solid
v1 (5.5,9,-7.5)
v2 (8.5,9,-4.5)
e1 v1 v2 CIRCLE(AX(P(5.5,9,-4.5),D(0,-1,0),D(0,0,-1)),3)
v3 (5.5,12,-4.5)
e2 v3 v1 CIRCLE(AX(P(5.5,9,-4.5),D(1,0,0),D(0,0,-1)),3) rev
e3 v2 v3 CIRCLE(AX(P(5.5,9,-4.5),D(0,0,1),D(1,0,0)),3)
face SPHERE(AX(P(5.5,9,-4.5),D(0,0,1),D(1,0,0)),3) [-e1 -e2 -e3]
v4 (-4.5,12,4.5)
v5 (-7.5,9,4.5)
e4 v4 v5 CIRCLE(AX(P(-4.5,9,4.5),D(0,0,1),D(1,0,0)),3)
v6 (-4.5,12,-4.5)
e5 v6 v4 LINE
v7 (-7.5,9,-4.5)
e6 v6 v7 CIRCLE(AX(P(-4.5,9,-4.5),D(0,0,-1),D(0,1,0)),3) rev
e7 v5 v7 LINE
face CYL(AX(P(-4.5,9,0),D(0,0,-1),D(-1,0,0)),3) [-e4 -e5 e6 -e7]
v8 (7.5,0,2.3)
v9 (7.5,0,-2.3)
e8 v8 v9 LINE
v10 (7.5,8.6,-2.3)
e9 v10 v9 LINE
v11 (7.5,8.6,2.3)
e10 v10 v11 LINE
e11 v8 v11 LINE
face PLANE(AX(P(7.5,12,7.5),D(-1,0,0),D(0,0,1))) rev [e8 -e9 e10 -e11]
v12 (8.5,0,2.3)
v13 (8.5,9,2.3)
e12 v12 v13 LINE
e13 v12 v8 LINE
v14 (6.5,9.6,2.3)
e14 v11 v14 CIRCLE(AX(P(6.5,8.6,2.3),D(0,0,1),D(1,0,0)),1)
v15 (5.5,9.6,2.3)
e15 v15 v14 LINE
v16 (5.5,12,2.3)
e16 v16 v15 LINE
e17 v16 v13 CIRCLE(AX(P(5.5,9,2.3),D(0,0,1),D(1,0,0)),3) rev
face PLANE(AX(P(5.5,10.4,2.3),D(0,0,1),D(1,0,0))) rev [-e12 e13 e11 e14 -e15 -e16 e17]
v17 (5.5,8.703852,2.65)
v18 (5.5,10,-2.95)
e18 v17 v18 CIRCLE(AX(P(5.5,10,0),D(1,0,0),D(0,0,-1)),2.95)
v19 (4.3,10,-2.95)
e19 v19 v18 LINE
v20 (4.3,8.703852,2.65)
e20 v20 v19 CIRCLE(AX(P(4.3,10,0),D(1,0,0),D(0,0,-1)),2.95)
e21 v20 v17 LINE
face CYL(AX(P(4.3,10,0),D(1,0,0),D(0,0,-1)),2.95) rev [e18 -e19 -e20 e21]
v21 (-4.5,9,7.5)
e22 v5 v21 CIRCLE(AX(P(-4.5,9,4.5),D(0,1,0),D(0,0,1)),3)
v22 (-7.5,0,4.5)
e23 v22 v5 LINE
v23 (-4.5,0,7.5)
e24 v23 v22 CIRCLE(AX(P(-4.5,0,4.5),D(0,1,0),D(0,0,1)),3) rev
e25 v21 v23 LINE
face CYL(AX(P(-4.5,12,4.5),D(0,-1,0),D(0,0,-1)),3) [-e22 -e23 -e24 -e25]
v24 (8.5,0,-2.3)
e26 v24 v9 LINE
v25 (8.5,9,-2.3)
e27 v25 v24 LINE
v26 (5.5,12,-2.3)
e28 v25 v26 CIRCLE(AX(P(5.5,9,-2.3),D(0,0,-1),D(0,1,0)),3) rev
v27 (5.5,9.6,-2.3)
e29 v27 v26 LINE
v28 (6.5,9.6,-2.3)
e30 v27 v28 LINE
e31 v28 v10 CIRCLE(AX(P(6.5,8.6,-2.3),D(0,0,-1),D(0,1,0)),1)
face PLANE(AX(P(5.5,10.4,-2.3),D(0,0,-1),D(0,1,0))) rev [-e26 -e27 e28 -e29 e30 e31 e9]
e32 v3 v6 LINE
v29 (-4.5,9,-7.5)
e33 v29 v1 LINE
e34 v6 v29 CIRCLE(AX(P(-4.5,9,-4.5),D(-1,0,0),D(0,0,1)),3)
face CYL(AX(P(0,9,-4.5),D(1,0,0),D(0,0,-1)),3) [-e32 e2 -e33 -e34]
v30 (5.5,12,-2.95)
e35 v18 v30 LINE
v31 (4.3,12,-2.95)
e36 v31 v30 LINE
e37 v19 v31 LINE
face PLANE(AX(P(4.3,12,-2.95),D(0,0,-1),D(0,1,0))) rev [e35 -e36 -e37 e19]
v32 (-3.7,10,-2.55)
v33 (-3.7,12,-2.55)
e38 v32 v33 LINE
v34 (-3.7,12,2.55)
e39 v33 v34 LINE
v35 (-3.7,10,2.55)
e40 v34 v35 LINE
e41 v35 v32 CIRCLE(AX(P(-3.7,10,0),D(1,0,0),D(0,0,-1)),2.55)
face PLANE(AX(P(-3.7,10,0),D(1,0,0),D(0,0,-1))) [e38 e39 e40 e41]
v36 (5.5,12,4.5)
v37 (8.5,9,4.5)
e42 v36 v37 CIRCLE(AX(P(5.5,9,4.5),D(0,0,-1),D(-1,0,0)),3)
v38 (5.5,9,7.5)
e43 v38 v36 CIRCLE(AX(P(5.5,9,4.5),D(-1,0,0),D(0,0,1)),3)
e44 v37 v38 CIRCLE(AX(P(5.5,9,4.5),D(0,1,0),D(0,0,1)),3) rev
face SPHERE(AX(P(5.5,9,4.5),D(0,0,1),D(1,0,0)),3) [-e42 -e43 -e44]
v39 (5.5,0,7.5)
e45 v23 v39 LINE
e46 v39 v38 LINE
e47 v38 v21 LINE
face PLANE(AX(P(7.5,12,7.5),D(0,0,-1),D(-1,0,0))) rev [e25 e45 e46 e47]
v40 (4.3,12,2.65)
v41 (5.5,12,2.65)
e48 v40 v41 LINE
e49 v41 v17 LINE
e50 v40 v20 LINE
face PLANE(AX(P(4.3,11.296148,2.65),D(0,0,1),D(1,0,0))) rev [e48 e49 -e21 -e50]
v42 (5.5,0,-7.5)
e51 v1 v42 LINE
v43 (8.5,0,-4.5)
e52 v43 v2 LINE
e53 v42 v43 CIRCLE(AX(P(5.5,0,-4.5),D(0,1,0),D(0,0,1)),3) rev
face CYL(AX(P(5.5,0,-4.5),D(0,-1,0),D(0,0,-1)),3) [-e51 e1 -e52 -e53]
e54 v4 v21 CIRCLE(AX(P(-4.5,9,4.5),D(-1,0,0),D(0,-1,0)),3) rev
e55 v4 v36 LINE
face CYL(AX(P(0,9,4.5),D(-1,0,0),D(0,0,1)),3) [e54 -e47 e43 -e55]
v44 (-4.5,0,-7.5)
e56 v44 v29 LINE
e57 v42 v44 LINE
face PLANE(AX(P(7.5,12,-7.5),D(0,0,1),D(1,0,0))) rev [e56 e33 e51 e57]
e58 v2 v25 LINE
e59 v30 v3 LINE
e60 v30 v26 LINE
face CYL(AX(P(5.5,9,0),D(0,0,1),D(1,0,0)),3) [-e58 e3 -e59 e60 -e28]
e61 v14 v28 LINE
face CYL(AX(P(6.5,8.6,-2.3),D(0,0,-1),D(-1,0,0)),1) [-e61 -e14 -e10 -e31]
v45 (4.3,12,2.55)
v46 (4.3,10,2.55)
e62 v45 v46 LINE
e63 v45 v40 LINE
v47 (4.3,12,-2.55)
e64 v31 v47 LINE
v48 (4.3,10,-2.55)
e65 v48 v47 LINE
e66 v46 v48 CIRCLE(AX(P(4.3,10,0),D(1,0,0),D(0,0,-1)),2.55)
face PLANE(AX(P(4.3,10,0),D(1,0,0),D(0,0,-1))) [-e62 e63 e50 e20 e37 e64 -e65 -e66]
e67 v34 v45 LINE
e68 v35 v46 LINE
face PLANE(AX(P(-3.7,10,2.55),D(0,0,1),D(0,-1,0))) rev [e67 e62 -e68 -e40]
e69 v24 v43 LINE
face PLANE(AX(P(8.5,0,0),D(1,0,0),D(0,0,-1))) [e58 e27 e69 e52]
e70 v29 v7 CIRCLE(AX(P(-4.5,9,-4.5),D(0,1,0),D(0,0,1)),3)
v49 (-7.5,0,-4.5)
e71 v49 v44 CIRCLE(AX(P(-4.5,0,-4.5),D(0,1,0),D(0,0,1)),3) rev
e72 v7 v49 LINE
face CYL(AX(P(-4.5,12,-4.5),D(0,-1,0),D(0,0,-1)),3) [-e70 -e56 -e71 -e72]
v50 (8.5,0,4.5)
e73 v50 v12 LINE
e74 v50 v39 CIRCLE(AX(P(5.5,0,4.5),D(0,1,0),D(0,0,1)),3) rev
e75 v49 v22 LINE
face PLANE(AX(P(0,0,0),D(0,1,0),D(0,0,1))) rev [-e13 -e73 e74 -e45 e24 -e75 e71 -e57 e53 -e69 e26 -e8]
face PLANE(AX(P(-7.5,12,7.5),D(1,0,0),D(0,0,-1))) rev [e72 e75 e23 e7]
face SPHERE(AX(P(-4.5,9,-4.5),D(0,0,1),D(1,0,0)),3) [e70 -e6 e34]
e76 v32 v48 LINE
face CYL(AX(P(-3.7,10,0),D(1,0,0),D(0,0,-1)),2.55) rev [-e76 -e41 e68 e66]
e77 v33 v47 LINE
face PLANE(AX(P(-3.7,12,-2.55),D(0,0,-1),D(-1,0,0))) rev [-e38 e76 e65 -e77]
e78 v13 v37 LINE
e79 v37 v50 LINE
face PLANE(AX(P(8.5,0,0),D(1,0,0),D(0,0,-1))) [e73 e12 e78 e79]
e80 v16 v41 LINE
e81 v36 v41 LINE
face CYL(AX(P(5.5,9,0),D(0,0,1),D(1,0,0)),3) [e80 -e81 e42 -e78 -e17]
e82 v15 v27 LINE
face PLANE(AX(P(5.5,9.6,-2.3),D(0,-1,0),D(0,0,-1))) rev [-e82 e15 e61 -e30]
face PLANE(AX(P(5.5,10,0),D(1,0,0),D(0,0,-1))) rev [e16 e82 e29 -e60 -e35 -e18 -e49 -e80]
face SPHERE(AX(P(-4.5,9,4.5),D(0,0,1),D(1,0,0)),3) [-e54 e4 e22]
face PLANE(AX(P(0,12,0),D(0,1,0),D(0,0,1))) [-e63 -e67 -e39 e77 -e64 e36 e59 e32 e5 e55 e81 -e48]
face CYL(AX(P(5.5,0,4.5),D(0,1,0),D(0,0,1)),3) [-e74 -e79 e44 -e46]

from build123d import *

# Parameters (mm, degrees)
SKETCH1_W           = 15
SKETCH1_H           = 15
BOSS_EXTRUDE1_DEPTH = 12
CUT_EXTRUDE1_DEPTH  = 2
CUT_EXTRUDE2_DEPTH  = 1.2
CUT_EXTRUDE3_DEPTH  = 8
SKETCH5_W           = 5.2
SKETCH5_H           = 12
BOSS_EXTRUDE2_DEPTH = 1
FILLET2_R           = 1
FILLET3_R           = 3
FILLET4_R           = 3


with BuildPart() as part:
    # Sketch1 → Boss-Extrude1 (new body)
    with BuildSketch(Plane(origin=(0, 0, 0), x_dir=(1, 0, 0), z_dir=(0, 1, 0))):
        Rectangle(SKETCH1_W, SKETCH1_H)
    extrude(amount=BOSS_EXTRUDE1_DEPTH)

    # Sketch2 → Cut-Extrude1 (cut)
    with BuildSketch(Plane(origin=(7.5, 0, 0), x_dir=(0, 0, -1), z_dir=(1, 0, 0))):
        Polygon((2.3, 10.4), (2.3, 9.6), (-2.3, 9.6), (-2.3, 10.4), (-2.3, 12), (2.3, 12), align=None)
    extrude(amount=-CUT_EXTRUDE1_DEPTH, mode=Mode.SUBTRACT)

    # Sketch3 → Cut-Extrude2 (cut)
    with BuildSketch(Plane(origin=(5.5, 0, 0), x_dir=(0, 0, -1), z_dir=(1, 0, 0))):
        with BuildLine():
            Line((-2.65, 11.29614814), (-2.65, 8.70385186))
            ThreePointArc((-2.65, 8.70385186), (0.665206735, 7.125978427), (2.95, 10))
            Line((2.95, 10), (2.95, 12))
            Line((2.95, 12), (-2.65, 12))
            Line((-2.65, 12), (-2.65, 11.29614814))
        make_face()
    extrude(amount=-CUT_EXTRUDE2_DEPTH, mode=Mode.SUBTRACT)

    # Sketch4 → Cut-Extrude3 (cut)
    with BuildSketch(Plane(origin=(4.3, 0, 0), x_dir=(0, 0, -1), z_dir=(1, 0, 0))):
        with BuildLine():
            Line((-2.55, 10), (-2.55, 12))
            Line((-2.55, 12), (2.55, 12))
            Line((2.55, 12), (2.55, 10))
            ThreePointArc((2.55, 10), (0, 7.45), (-2.55, 10))
        make_face()
    extrude(amount=-CUT_EXTRUDE3_DEPTH, mode=Mode.SUBTRACT)

    # Sketch5 → Boss-Extrude2 (add)
    with BuildSketch(Plane(origin=(7.5, 0, 0), x_dir=(0, 0, -1), z_dir=(1, 0, 0))):
        with Locations((4.9, 6)):
            Rectangle(SKETCH5_W, SKETCH5_H)
        with Locations((-4.9, 6)):
            Rectangle(SKETCH5_W, SKETCH5_H)
    extrude(amount=BOSS_EXTRUDE2_DEPTH)

    # Fillet2
    fillet2_edges = [part.edges().sort_by_distance(p)[0] for p in [
        (7.5, 9.6, 0),
    ]]
    fillet(fillet2_edges, radius=FILLET2_R)

    # Fillet3
    fillet3_edges = [part.edges().sort_by_distance(p)[0] for p in [
        (0.5, 12, -7.5),
        (-7.5, 12, 0),
        (8.5, 6, 7.5),
        (0.5, 12, 7.5),
        (-7.5, 6, -7.5),
        (8.5, 6, -7.5),
        (-7.5, 6, 7.5),
    ]]
    fillet(fillet3_edges, radius=FILLET3_R)

    # Fillet4
    # the kernel refuses this fillet: 3 mm, written as the material it takes off along each edge
    with BuildSketch(Plane(origin=(5.5, 9, 4.5), x_dir=(1, 0, 0), z_dir=(0, 1, 0))) as fillet4_piece_1_section:
        Polygon((0, 0), (FILLET4_R, 0), (FILLET4_R, -FILLET4_R), (0, -FILLET4_R), align=None)
    fillet4_piece_1 = extrude(amount=FILLET4_R, mode=Mode.PRIVATE)
    fillet4_piece_1 = fillet4_piece_1 - Plane(origin=(5.5, 9, 4.5), x_dir=(-0.7071067811865477, 0, -0.7071067811865475), z_dir=(0, 1, 0)) * Sphere(FILLET4_R, mode=Mode.PRIVATE)
    add(fillet4_piece_1, mode=Mode.SUBTRACT)
    with BuildSketch(Plane(origin=(5.5, 9, -4.5), x_dir=(1, 0, 0), z_dir=(0, 1, 0))) as fillet4_piece_2_section:
        Polygon((0, 0), (FILLET4_R, 0), (FILLET4_R, FILLET4_R), (0, FILLET4_R), align=None)
    fillet4_piece_2 = extrude(amount=FILLET4_R, mode=Mode.PRIVATE)
    fillet4_piece_2 = fillet4_piece_2 - Plane(origin=(5.5, 9, -4.5), x_dir=(-0.7071067811865475, 0, 0.7071067811865476), z_dir=(0, 1, 0)) * Sphere(FILLET4_R, mode=Mode.PRIVATE)
    add(fillet4_piece_2, mode=Mode.SUBTRACT)
    with BuildSketch(Plane(origin=(8.5, 12, -5.2), x_dir=(-1, 0, 0), z_dir=(0, 0, 1)), Plane(origin=(8.5, 12, -4.5), x_dir=(-1, 0, 0), z_dir=(0, 0, 1))) as fillet4_piece_3:
        with BuildLine():
            CenterArc((FILLET4_R, FILLET4_R), FILLET4_R, 180, 90)
            Line((0, FILLET4_R), (0, 0))
            Line((0, 0), (FILLET4_R, 0))
        make_face()
    extrude(amount=9.7, mode=Mode.SUBTRACT)


solid = part.part
